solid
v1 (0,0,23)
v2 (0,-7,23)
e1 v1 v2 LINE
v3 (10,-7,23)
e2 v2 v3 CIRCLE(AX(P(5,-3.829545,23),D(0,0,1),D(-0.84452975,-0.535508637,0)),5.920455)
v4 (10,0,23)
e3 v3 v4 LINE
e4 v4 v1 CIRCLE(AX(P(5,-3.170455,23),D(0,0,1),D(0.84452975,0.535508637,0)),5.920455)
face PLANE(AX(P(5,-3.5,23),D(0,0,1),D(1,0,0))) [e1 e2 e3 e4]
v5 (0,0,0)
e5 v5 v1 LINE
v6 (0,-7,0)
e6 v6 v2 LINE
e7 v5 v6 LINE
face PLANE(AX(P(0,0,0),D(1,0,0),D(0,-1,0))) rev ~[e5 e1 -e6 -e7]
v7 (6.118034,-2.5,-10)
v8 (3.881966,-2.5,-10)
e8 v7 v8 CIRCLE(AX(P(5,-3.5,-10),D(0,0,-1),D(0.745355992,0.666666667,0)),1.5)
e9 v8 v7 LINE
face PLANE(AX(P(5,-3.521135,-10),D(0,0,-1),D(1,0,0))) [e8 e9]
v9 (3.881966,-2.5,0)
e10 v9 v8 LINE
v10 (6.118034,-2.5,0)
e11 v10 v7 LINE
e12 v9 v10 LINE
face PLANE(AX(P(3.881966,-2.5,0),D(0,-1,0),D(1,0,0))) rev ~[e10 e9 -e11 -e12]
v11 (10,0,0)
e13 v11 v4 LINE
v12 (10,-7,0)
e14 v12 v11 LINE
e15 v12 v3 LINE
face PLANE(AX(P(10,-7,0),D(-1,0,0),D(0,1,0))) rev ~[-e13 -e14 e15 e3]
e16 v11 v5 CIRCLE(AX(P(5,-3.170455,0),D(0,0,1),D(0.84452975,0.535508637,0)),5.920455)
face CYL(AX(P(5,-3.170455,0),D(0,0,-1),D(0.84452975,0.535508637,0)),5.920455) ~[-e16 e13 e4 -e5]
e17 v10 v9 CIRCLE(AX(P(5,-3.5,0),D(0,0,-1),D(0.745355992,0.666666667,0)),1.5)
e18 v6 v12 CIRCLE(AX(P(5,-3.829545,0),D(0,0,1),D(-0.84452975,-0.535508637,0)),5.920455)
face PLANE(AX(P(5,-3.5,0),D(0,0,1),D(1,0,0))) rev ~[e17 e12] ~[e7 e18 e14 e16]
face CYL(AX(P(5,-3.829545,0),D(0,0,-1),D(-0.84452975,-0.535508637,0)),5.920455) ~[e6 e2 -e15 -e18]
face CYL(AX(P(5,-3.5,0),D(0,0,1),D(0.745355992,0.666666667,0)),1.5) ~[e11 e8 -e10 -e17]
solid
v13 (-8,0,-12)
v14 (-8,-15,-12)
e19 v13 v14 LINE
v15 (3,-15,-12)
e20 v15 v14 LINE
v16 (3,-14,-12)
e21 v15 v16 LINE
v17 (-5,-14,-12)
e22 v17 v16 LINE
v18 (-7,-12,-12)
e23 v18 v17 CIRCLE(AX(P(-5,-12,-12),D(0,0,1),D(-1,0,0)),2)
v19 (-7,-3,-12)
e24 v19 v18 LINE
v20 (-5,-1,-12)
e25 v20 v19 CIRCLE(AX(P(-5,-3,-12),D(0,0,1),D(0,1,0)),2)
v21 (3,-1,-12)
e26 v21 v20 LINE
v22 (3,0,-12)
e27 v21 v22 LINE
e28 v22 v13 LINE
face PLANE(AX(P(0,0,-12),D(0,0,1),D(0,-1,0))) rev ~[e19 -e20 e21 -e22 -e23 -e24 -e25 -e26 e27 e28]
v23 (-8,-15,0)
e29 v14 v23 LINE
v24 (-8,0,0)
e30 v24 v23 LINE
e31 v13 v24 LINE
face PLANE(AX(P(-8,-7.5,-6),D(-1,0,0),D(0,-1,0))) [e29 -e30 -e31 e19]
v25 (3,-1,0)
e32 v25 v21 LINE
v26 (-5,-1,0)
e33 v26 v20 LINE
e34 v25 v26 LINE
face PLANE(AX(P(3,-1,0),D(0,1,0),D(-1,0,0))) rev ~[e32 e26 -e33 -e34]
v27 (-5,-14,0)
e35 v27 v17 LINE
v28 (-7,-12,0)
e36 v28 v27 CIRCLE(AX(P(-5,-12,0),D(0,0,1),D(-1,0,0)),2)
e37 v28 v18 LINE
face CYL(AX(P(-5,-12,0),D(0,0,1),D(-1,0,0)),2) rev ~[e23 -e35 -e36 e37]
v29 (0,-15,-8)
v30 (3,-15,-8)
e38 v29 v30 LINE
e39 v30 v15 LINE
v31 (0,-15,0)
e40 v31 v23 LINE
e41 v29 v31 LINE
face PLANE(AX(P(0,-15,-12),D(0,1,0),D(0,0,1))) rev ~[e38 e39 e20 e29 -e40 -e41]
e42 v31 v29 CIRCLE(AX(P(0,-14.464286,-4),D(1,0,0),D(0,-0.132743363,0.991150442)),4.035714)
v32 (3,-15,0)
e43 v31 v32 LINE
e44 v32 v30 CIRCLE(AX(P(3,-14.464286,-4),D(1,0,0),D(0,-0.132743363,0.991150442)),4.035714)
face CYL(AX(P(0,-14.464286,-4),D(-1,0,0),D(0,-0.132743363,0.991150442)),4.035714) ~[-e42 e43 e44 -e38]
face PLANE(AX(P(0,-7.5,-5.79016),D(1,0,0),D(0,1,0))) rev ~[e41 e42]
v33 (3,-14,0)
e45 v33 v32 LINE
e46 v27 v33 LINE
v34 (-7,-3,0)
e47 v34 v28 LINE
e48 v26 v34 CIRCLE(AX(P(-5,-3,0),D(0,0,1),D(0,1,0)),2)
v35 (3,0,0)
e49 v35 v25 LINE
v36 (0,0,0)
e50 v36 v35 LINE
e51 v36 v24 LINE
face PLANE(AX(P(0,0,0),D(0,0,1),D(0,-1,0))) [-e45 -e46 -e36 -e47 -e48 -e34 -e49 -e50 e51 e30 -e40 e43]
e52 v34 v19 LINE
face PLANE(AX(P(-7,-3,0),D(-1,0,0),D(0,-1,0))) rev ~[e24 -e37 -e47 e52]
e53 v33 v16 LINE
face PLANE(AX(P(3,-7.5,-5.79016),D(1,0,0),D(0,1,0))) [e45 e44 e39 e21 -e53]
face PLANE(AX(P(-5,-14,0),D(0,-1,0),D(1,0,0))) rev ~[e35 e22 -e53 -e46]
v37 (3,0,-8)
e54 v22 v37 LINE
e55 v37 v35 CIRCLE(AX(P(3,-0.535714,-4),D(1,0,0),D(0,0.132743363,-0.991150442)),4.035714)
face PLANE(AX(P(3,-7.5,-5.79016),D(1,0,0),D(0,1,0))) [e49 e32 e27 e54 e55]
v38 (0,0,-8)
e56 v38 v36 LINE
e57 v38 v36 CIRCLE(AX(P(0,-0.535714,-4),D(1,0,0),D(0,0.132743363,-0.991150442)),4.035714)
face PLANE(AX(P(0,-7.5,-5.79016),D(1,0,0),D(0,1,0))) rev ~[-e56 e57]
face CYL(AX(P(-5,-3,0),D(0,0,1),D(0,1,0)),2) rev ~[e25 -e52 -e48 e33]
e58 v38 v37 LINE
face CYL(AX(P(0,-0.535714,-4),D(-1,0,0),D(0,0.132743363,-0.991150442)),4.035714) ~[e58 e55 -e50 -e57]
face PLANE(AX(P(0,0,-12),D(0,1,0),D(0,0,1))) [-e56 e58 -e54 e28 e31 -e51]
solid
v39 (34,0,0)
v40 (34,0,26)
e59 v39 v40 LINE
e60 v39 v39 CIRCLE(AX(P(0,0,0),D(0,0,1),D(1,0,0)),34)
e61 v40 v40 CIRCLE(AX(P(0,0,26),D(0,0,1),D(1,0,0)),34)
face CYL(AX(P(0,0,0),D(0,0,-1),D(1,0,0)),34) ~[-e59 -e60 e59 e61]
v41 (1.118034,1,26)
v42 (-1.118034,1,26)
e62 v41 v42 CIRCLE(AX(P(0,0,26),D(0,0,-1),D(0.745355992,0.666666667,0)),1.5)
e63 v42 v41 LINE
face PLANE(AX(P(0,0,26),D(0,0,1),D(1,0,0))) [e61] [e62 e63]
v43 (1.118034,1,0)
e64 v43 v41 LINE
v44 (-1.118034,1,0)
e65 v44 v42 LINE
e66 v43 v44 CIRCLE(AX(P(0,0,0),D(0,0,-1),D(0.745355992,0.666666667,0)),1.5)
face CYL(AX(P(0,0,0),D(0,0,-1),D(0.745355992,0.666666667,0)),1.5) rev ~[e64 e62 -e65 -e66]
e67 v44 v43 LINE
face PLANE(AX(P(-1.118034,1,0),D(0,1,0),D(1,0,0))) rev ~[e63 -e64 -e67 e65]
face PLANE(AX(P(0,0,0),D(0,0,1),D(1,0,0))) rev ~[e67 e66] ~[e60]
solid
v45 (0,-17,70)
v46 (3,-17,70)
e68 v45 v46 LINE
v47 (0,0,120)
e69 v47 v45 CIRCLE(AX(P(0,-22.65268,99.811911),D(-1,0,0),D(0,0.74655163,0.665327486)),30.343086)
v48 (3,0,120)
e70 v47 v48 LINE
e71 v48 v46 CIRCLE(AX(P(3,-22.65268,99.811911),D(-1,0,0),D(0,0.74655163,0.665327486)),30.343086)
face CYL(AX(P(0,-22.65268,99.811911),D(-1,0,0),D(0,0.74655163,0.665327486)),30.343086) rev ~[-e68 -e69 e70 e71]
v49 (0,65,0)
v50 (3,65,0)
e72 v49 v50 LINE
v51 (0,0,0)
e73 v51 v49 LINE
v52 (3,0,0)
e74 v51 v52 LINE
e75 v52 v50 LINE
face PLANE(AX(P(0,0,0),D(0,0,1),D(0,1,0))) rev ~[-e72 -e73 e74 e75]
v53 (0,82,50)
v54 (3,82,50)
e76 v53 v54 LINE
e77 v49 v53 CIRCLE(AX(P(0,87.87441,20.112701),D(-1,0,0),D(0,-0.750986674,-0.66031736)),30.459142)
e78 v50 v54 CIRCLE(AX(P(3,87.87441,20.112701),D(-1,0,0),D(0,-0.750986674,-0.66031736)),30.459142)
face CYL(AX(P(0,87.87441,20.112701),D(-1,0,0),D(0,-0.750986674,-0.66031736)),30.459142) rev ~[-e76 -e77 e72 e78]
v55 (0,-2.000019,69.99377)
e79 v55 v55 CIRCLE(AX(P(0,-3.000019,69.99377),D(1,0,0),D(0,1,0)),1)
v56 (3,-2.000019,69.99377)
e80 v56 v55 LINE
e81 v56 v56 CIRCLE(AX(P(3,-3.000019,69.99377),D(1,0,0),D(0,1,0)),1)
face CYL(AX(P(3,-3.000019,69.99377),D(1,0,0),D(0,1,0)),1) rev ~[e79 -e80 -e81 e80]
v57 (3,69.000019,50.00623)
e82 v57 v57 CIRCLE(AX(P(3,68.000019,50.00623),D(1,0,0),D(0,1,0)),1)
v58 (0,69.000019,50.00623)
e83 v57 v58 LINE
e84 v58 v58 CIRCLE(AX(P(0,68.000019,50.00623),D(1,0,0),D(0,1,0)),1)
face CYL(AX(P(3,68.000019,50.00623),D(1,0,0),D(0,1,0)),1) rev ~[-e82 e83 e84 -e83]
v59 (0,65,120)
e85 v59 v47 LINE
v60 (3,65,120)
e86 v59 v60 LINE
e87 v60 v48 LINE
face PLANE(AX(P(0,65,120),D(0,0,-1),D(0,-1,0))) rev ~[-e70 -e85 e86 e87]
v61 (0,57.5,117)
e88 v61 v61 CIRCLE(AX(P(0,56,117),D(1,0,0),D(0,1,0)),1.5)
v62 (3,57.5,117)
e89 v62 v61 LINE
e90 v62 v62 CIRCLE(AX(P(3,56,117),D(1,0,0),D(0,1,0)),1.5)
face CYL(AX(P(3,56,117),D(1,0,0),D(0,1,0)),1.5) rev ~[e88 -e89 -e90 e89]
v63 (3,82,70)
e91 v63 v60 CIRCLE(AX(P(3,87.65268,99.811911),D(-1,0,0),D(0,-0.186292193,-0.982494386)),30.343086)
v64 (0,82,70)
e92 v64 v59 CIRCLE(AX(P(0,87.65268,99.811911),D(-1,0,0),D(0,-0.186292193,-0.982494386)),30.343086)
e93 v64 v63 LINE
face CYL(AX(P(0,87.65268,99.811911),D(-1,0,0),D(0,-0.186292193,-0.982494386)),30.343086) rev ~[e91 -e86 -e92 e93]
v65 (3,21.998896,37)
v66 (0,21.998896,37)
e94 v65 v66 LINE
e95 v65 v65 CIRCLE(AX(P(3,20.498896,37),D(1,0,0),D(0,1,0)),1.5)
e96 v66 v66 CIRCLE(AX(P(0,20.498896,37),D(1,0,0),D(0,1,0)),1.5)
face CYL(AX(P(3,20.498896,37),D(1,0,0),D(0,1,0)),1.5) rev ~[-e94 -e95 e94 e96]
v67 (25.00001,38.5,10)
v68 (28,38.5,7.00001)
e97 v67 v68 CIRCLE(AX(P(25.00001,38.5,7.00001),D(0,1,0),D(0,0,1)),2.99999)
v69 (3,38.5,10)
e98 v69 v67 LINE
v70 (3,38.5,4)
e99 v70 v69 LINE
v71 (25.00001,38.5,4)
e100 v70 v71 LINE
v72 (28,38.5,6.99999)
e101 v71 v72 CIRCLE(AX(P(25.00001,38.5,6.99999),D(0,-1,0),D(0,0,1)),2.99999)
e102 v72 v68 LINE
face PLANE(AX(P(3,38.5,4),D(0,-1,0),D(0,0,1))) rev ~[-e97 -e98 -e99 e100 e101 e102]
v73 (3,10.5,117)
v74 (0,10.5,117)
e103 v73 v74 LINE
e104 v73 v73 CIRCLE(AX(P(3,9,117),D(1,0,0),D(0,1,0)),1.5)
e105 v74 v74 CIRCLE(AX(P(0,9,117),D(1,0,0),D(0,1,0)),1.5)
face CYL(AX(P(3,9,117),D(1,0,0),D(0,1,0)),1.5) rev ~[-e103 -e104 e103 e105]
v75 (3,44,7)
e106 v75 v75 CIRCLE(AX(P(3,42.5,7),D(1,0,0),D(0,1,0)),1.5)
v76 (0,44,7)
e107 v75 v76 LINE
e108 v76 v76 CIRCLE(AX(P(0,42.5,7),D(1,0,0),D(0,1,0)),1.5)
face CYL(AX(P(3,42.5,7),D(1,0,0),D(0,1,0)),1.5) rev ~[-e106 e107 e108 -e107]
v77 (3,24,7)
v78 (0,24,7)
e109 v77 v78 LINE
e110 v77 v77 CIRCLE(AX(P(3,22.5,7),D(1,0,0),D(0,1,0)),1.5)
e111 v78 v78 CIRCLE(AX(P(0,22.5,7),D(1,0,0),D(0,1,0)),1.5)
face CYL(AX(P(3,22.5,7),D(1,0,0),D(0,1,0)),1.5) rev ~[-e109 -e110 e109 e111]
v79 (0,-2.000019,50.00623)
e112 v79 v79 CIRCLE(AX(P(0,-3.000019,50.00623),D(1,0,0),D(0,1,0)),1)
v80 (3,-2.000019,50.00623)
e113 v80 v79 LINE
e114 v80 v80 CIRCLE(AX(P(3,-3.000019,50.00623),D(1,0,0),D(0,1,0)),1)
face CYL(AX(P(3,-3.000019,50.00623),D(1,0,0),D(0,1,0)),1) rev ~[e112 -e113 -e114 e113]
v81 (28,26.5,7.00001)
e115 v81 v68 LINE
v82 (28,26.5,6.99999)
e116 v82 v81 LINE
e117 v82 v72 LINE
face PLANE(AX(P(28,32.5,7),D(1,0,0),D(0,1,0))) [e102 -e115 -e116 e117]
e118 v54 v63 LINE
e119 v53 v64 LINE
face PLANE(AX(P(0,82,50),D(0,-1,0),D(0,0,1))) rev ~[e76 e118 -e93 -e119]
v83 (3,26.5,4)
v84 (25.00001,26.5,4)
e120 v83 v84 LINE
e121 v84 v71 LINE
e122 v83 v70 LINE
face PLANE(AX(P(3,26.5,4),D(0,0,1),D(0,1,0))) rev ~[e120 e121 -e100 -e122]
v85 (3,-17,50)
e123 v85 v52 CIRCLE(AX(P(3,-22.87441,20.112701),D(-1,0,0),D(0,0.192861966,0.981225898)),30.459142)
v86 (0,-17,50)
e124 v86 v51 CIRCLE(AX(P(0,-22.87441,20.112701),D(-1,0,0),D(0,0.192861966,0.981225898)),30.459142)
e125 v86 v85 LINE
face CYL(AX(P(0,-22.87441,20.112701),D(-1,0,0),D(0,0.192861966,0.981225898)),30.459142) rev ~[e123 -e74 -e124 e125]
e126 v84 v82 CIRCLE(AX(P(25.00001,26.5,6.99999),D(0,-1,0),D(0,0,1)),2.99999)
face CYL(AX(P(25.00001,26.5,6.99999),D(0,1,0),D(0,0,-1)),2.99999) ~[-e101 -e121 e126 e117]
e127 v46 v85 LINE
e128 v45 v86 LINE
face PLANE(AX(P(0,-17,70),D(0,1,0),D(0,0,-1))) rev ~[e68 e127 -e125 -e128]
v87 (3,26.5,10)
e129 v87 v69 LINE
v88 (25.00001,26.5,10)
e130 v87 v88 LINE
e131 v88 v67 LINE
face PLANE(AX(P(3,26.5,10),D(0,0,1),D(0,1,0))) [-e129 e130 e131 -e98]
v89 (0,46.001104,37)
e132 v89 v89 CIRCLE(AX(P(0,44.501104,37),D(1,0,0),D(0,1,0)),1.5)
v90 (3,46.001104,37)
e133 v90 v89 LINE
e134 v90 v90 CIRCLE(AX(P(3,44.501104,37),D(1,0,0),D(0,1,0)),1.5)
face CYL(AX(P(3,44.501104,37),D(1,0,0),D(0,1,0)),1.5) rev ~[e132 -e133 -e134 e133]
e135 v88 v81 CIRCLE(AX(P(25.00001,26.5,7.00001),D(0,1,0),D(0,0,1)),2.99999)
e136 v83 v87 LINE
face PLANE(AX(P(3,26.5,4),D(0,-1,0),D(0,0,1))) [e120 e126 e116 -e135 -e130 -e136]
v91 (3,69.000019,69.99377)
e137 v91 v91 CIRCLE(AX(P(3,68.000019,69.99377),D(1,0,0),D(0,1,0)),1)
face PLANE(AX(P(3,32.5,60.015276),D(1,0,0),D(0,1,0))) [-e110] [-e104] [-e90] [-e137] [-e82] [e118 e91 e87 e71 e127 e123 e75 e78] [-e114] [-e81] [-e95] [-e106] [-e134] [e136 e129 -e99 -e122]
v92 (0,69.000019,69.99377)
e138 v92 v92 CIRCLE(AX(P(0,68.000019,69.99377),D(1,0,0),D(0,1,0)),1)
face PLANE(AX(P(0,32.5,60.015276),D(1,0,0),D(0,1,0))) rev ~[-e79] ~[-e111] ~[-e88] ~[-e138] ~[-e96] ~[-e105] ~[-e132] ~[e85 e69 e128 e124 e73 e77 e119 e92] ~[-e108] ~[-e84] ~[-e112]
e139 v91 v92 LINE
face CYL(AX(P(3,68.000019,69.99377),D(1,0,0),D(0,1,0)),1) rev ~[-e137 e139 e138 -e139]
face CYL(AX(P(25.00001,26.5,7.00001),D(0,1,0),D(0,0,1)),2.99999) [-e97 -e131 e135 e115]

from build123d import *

# Parameters (mm, degrees)
F0_R      = 34
F1_DEPTH  = 26
F3_DEPTH  = 26
F5_DEPTH  = 23
F7_DEPTH  = 10
F9_DEPTH  = 3
F10_W     = 15
F10_H     = 12
F11_DEPTH = 8
F13_DEPTH = 25
F15_DEPTH = 3
F16_W     = 12
F16_H     = 6
F17_DEPTH = 25
F19_R     = 2.99999
F18_R     = 1
F18_R_2   = 1.5
F20_DEPTH = 25


# Not quite as in the source:
# - a fillet or chamfer is up to 0.001 mm smaller than in the source, because OpenCascade refuses the exact size


with BuildPart() as f1:
    # F0 (on Top) → F1 (new body)
    with BuildSketch(Plane.XY):
        Circle(F0_R)
    extrude(amount=F1_DEPTH)

    # F2 (on face) → F3 (cut)
    with BuildSketch(Plane(origin=(0, 0, 0), x_dir=(1, 0, 0), z_dir=(0, 0, -1))):
        with BuildLine():
            Line((-1.1180339887, -1), (1.1180339887, -1))
            ThreePointArc((1.1180339887, -1), (0, 1.5), (-1.1180339887, -1))
        make_face()
    extrude(amount=-F3_DEPTH, mode=Mode.SUBTRACT)


with BuildPart() as f5:
    # F4 (on Top) → F5 (new body)
    with BuildSketch(Plane.XY):
        with BuildLine():
            ThreePointArc((10, 0), (5, 2.75), (0, 0))
            Line((0, 0), (0, -7))
            ThreePointArc((0, -7), (5, -9.75), (10, -7))
            Line((10, -7), (10, 0))
        make_face()
    extrude(amount=F5_DEPTH)

    # F6 (on face) → F7 (join)
    with BuildSketch(Plane(origin=(0, 0, 0), x_dir=(1, 0, 0), z_dir=(0, 0, -1))):
        with BuildLine():
            Line((3.8819660113, 2.5), (6.1180339887, 2.5))
            ThreePointArc((6.1180339887, 2.5), (5, 5), (3.8819660113, 2.5))
        make_face()
    extrude(amount=F7_DEPTH)


with BuildPart() as f9:
    # F8 (on Right) → F9 (new body)
    with BuildSketch(Plane.YZ):
        with BuildLine():
            ThreePointArc((0, -8), (3.5, -4), (0, 0))
            Line((0, 0), (-15, 0))
            ThreePointArc((-15, 0), (-18.5, -4), (-15, -8))
            Line((-15, -8), (-15, -12))
            Line((-15, -12), (0, -12))
            Line((0, -12), (0, -8))
        make_face()
    extrude(amount=F9_DEPTH)

    # F10 (on face) → F11 (join)
    with BuildSketch(Plane(origin=(0, 0, 0), x_dir=(0, -1, 0), z_dir=(-1, 0, 0))):
        with Locations((7.5, -6)):
            Rectangle(F10_W, F10_H)
    extrude(amount=F11_DEPTH)

    # F12 (on face) → F13 (cut)
    with BuildSketch(Plane.XY):
        with BuildLine():
            Line((3, -14), (3, -1))
            Line((3, -1), (-5, -1))
            ThreePointArc((-5, -1), (-6.4142135624, -1.5857864376), (-7, -3))
            Line((-7, -3), (-7, -12))
            ThreePointArc((-7, -12), (-6.4142135624, -13.4142135624), (-5, -14))
            Line((-5, -14), (3, -14))
        make_face()
    extrude(amount=-F13_DEPTH, mode=Mode.SUBTRACT)


with BuildPart() as f15:
    # F14 (on Right) → F15 (new body)
    with BuildSketch(Plane.YZ):
        with BuildLine():
            Line((-17, 70), (-17, 50))
            ThreePointArc((-17, 50), (5.9634758444, 29.9175817871), (0, 0))
            Line((0, 0), (65, 0))
            ThreePointArc((65, 0), (59.0365241556, 29.9175817871), (82, 50))
            Line((82, 50), (82, 70))
            ThreePointArc((82, 70), (58.9246735824, 90.044389018), (65, 120))
            Line((65, 120), (0, 120))
            ThreePointArc((0, 120), (6.0753264176, 90.044389018), (-17, 70))
        make_face()
    extrude(amount=F15_DEPTH)

    # F16 (on face) → F17 (join)
    with BuildSketch(Plane.YZ.offset(3)):
        with Locations((32.5, 7)):
            Rectangle(F16_W, F16_H)
    extrude(amount=F17_DEPTH)

    # F19 (radius 3 in the source; OpenCascade refuses exactly that, so slightly less here)
    f19_edges = [f15.edges().sort_by_distance(p)[0] for p in [
        (28, 32.5, 10),
        (28, 32.5, 4),
    ]]
    fillet(f19_edges, radius=F19_R)

    # F18 (on face) → F20 (cut)
    with BuildSketch(Plane.YZ.offset(3)):
        with Locations((68.0000194097, 50.0062304962)):
            Circle(F18_R)
        with Locations((68.0000194097, 69.9937695038)):
            Circle(F18_R)
        with Locations((-3.0000194097, 50.0062304962)):
            Circle(F18_R)
        with Locations((-3.0000194097, 69.9937695038)):
            Circle(F18_R)
        with Locations((22.5, 7)):
            Circle(F18_R_2)
        with Locations((42.5, 7)):
            Circle(F18_R_2)
        with Locations((9, 117)):
            Circle(F18_R_2)
        with Locations((56, 117)):
            Circle(F18_R_2)
        with Locations((20.4988960177, 37)):
            Circle(F18_R_2)
        with Locations((44.5011039823, 37)):
            Circle(F18_R_2)
    extrude(amount=-F20_DEPTH, mode=Mode.SUBTRACT)


solid = Compound([f1.part, f5.part, f9.part, f15.part])
